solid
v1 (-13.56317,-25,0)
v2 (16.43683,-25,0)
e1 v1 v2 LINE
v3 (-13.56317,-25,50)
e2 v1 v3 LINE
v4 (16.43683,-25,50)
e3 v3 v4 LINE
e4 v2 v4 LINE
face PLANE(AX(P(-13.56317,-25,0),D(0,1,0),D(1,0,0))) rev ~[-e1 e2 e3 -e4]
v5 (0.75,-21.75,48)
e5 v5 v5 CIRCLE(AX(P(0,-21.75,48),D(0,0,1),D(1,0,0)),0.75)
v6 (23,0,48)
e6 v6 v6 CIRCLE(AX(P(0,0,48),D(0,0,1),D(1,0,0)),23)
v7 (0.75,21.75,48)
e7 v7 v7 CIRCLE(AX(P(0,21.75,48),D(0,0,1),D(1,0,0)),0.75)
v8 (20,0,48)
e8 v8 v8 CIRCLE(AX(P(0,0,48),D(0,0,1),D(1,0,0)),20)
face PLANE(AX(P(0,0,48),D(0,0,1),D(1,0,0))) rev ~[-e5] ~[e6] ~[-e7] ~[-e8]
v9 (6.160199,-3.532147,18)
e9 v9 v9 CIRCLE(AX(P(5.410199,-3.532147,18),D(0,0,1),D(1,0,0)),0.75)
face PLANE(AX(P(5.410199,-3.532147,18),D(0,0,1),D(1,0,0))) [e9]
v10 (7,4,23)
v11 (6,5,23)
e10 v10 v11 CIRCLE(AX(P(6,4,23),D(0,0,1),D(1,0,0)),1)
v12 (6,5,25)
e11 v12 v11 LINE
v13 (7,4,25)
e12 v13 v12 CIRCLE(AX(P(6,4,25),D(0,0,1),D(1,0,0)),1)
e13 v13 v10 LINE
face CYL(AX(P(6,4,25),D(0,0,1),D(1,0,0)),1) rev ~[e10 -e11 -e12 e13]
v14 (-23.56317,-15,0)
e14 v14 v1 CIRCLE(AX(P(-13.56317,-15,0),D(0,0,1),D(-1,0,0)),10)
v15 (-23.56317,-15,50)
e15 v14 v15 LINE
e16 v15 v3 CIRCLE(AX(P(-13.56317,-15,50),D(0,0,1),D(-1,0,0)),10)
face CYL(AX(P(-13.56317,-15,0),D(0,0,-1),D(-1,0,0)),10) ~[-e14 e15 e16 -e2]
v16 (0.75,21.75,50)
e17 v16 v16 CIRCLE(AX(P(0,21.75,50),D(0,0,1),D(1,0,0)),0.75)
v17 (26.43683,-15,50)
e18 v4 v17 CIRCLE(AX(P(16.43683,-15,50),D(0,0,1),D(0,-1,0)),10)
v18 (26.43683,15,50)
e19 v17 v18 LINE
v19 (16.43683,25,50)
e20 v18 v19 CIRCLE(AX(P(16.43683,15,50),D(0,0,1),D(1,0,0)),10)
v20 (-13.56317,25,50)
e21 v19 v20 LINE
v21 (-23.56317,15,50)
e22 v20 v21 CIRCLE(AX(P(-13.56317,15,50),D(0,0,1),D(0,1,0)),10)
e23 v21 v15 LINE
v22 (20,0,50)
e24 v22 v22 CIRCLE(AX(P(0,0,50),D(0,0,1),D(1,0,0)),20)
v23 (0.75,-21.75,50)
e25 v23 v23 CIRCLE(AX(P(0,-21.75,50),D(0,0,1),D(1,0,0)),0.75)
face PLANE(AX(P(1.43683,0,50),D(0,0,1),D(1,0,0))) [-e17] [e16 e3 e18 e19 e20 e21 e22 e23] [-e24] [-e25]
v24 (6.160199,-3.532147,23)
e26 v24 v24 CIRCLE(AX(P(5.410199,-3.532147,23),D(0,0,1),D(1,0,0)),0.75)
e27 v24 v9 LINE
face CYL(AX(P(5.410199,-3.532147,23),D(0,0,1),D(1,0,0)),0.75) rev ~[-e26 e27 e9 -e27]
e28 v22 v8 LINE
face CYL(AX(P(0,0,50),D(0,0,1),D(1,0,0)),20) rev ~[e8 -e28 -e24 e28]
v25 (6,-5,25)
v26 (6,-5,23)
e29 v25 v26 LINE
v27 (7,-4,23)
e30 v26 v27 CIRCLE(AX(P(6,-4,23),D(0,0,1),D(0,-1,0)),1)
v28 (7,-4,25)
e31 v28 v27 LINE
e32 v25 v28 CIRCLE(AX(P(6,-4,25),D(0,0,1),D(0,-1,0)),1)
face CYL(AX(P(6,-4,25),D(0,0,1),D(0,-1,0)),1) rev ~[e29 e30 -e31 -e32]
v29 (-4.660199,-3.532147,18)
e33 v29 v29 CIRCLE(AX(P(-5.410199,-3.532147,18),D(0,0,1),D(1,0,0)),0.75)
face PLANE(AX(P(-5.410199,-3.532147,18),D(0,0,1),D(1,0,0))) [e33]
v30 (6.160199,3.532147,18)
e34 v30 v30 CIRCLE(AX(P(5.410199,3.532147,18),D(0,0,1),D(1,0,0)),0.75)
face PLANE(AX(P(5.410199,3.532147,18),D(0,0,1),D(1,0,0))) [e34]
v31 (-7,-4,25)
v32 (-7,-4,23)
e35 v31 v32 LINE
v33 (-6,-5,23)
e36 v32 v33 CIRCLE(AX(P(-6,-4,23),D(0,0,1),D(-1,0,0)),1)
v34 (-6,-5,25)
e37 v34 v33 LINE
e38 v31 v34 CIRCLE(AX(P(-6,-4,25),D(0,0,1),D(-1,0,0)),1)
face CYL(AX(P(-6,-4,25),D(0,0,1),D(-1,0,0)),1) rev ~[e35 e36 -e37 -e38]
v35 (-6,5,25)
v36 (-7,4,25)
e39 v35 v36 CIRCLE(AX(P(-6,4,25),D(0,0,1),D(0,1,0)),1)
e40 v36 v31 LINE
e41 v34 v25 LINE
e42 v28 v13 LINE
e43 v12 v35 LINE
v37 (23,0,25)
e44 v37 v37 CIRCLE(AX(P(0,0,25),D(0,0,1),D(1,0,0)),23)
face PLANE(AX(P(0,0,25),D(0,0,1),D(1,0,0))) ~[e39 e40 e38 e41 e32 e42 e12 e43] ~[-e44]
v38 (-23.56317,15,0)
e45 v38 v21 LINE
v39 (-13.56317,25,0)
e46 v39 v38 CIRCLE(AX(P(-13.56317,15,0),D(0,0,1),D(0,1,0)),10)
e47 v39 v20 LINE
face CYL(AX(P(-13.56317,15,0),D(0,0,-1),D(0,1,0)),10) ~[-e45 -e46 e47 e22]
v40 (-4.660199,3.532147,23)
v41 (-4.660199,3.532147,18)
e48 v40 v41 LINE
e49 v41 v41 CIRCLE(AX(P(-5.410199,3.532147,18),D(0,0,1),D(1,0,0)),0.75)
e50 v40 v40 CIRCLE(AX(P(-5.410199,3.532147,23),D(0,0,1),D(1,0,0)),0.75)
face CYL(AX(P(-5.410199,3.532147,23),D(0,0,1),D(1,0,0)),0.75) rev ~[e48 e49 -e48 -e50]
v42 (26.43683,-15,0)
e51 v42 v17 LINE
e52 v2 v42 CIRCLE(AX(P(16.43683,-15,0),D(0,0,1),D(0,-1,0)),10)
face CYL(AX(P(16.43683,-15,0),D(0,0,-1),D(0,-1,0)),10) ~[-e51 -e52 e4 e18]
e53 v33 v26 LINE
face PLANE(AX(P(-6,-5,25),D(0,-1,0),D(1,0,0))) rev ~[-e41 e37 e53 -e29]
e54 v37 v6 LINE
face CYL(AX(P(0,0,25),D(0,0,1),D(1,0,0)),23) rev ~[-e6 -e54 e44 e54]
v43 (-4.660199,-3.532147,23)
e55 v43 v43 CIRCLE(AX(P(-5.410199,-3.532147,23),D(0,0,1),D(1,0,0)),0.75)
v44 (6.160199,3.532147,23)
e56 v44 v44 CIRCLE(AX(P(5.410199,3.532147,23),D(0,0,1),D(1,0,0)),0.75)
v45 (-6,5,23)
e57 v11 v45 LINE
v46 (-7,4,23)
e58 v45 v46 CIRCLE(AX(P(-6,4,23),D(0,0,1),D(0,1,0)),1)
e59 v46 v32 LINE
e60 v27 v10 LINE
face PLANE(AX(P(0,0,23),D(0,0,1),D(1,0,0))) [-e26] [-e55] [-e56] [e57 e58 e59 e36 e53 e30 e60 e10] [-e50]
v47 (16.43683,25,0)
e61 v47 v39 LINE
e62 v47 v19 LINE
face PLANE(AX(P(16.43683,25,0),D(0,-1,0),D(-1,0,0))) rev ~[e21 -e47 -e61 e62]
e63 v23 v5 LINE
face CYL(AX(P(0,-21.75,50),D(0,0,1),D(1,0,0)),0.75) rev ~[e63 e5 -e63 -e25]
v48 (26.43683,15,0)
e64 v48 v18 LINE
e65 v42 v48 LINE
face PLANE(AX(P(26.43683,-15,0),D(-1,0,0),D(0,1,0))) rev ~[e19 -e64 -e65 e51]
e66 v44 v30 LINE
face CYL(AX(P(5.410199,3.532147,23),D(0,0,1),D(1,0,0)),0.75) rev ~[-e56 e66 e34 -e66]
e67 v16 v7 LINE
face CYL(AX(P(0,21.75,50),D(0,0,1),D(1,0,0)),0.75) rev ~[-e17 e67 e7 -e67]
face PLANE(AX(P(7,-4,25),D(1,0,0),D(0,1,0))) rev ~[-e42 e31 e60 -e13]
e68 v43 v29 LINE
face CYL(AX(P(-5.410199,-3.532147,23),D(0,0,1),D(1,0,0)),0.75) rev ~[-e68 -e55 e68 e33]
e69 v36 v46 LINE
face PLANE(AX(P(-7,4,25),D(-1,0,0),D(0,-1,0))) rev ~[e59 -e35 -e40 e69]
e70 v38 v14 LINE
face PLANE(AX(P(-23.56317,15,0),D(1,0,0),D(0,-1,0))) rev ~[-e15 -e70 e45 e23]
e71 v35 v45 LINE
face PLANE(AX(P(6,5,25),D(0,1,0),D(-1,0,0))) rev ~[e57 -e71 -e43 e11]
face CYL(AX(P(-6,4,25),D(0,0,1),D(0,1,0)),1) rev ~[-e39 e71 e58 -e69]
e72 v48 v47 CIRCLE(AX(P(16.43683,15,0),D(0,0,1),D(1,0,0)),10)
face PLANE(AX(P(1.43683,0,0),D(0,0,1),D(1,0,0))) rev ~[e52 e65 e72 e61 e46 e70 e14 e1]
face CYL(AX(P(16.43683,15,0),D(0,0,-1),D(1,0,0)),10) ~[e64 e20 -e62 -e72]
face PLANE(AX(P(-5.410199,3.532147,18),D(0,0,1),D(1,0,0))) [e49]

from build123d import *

# Parameters (mm, degrees)
F1_DEPTH  = 50
F2_R      = 20
F3_DEPTH  = 25
F6_R      = 0.75
F7_DEPTH  = 25
F9_DEPTH  = 2
F10_R     = 0.75
F11_DEPTH = 5


# Not quite as in the source:
# - the program builds the solid bodies; features that only make, move or delete a surface that nothing else refers to are left out


with BuildPart() as f1:
    # F0 (on Top) → F1 (new body)
    with BuildSketch(Plane.XY):
        with BuildLine():
            Line((16.436829567, 25), (-13.563170433, 25))
            ThreePointArc((-13.563170433, 25), (-20.6342382449, 22.0710678119), (-23.563170433, 15))
            Line((-23.563170433, 15), (-23.563170433, -15))
            ThreePointArc((-23.563170433, -15), (-20.6342382449, -22.0710678119), (-13.563170433, -25))
            Line((-13.563170433, -25), (16.436829567, -25))
            ThreePointArc((16.436829567, -25), (23.5078973788, -22.0710678119), (26.436829567, -15))
            Line((26.436829567, -15), (26.436829567, 15))
            ThreePointArc((26.436829567, 15), (23.5078973788, 22.0710678119), (16.436829567, 25))
        make_face()
    extrude(amount=F1_DEPTH)

    # F2 (on face) → F3 (cut)
    with BuildSketch(Plane.XY.offset(50)):
        Circle(F2_R)
    extrude(amount=-F3_DEPTH, mode=Mode.SUBTRACT)

    # F4 (on Front) → F5 (revolve, cut)
    with BuildSketch(Plane.XZ):
        Polygon((20, 48), (20, 50), (0, 50), (0, 25), (23, 25), (23, 48), align=None)
    revolve(axis=Axis((0, 0, 37.5), (0, 0, 1)), mode=Mode.SUBTRACT)

    # F6 (on face) → F7 (cut)
    with BuildSketch(Plane.XY.offset(50)):
        with Locations((0, 21.75)):
            Circle(F6_R)
        with Locations((0, -21.75)):
            Circle(F6_R)
    extrude(amount=-F7_DEPTH, mode=Mode.SUBTRACT)

    # F8 (on face) → F9 (cut)
    with BuildSketch(Plane.XY.offset(25)):
        with BuildLine():
            ThreePointArc((7, 4), (6.7071067812, 4.7071067812), (6, 5))
            Line((6, 5), (-6, 5))
            ThreePointArc((-6, 5), (-6.7071067812, 4.7071067812), (-7, 4))
            Line((-7, 4), (-7, -4))
            ThreePointArc((-7, -4), (-6.7071067812, -4.7071067812), (-6, -5))
            Line((-6, -5), (6, -5))
            ThreePointArc((6, -5), (6.7071067812, -4.7071067812), (7, -4))
            Line((7, -4), (7, 4))
        make_face()
    extrude(amount=-F9_DEPTH, mode=Mode.SUBTRACT)

    # F10 (on face) → F11 (cut)
    with BuildSketch(Plane.XY.offset(23)):
        with Locations((-5.4101994716, 3.5321465987)):
            Circle(F10_R)
        with Locations((-5.4101994716, -3.5321465987)):
            Circle(F10_R)
        with Locations((5.4101994716, 3.5321465987)):
            Circle(F10_R)
        with Locations((5.4101994716, -3.5321465987)):
            Circle(F10_R)
    extrude(amount=-F11_DEPTH, mode=Mode.SUBTRACT)


solid = f1.part
